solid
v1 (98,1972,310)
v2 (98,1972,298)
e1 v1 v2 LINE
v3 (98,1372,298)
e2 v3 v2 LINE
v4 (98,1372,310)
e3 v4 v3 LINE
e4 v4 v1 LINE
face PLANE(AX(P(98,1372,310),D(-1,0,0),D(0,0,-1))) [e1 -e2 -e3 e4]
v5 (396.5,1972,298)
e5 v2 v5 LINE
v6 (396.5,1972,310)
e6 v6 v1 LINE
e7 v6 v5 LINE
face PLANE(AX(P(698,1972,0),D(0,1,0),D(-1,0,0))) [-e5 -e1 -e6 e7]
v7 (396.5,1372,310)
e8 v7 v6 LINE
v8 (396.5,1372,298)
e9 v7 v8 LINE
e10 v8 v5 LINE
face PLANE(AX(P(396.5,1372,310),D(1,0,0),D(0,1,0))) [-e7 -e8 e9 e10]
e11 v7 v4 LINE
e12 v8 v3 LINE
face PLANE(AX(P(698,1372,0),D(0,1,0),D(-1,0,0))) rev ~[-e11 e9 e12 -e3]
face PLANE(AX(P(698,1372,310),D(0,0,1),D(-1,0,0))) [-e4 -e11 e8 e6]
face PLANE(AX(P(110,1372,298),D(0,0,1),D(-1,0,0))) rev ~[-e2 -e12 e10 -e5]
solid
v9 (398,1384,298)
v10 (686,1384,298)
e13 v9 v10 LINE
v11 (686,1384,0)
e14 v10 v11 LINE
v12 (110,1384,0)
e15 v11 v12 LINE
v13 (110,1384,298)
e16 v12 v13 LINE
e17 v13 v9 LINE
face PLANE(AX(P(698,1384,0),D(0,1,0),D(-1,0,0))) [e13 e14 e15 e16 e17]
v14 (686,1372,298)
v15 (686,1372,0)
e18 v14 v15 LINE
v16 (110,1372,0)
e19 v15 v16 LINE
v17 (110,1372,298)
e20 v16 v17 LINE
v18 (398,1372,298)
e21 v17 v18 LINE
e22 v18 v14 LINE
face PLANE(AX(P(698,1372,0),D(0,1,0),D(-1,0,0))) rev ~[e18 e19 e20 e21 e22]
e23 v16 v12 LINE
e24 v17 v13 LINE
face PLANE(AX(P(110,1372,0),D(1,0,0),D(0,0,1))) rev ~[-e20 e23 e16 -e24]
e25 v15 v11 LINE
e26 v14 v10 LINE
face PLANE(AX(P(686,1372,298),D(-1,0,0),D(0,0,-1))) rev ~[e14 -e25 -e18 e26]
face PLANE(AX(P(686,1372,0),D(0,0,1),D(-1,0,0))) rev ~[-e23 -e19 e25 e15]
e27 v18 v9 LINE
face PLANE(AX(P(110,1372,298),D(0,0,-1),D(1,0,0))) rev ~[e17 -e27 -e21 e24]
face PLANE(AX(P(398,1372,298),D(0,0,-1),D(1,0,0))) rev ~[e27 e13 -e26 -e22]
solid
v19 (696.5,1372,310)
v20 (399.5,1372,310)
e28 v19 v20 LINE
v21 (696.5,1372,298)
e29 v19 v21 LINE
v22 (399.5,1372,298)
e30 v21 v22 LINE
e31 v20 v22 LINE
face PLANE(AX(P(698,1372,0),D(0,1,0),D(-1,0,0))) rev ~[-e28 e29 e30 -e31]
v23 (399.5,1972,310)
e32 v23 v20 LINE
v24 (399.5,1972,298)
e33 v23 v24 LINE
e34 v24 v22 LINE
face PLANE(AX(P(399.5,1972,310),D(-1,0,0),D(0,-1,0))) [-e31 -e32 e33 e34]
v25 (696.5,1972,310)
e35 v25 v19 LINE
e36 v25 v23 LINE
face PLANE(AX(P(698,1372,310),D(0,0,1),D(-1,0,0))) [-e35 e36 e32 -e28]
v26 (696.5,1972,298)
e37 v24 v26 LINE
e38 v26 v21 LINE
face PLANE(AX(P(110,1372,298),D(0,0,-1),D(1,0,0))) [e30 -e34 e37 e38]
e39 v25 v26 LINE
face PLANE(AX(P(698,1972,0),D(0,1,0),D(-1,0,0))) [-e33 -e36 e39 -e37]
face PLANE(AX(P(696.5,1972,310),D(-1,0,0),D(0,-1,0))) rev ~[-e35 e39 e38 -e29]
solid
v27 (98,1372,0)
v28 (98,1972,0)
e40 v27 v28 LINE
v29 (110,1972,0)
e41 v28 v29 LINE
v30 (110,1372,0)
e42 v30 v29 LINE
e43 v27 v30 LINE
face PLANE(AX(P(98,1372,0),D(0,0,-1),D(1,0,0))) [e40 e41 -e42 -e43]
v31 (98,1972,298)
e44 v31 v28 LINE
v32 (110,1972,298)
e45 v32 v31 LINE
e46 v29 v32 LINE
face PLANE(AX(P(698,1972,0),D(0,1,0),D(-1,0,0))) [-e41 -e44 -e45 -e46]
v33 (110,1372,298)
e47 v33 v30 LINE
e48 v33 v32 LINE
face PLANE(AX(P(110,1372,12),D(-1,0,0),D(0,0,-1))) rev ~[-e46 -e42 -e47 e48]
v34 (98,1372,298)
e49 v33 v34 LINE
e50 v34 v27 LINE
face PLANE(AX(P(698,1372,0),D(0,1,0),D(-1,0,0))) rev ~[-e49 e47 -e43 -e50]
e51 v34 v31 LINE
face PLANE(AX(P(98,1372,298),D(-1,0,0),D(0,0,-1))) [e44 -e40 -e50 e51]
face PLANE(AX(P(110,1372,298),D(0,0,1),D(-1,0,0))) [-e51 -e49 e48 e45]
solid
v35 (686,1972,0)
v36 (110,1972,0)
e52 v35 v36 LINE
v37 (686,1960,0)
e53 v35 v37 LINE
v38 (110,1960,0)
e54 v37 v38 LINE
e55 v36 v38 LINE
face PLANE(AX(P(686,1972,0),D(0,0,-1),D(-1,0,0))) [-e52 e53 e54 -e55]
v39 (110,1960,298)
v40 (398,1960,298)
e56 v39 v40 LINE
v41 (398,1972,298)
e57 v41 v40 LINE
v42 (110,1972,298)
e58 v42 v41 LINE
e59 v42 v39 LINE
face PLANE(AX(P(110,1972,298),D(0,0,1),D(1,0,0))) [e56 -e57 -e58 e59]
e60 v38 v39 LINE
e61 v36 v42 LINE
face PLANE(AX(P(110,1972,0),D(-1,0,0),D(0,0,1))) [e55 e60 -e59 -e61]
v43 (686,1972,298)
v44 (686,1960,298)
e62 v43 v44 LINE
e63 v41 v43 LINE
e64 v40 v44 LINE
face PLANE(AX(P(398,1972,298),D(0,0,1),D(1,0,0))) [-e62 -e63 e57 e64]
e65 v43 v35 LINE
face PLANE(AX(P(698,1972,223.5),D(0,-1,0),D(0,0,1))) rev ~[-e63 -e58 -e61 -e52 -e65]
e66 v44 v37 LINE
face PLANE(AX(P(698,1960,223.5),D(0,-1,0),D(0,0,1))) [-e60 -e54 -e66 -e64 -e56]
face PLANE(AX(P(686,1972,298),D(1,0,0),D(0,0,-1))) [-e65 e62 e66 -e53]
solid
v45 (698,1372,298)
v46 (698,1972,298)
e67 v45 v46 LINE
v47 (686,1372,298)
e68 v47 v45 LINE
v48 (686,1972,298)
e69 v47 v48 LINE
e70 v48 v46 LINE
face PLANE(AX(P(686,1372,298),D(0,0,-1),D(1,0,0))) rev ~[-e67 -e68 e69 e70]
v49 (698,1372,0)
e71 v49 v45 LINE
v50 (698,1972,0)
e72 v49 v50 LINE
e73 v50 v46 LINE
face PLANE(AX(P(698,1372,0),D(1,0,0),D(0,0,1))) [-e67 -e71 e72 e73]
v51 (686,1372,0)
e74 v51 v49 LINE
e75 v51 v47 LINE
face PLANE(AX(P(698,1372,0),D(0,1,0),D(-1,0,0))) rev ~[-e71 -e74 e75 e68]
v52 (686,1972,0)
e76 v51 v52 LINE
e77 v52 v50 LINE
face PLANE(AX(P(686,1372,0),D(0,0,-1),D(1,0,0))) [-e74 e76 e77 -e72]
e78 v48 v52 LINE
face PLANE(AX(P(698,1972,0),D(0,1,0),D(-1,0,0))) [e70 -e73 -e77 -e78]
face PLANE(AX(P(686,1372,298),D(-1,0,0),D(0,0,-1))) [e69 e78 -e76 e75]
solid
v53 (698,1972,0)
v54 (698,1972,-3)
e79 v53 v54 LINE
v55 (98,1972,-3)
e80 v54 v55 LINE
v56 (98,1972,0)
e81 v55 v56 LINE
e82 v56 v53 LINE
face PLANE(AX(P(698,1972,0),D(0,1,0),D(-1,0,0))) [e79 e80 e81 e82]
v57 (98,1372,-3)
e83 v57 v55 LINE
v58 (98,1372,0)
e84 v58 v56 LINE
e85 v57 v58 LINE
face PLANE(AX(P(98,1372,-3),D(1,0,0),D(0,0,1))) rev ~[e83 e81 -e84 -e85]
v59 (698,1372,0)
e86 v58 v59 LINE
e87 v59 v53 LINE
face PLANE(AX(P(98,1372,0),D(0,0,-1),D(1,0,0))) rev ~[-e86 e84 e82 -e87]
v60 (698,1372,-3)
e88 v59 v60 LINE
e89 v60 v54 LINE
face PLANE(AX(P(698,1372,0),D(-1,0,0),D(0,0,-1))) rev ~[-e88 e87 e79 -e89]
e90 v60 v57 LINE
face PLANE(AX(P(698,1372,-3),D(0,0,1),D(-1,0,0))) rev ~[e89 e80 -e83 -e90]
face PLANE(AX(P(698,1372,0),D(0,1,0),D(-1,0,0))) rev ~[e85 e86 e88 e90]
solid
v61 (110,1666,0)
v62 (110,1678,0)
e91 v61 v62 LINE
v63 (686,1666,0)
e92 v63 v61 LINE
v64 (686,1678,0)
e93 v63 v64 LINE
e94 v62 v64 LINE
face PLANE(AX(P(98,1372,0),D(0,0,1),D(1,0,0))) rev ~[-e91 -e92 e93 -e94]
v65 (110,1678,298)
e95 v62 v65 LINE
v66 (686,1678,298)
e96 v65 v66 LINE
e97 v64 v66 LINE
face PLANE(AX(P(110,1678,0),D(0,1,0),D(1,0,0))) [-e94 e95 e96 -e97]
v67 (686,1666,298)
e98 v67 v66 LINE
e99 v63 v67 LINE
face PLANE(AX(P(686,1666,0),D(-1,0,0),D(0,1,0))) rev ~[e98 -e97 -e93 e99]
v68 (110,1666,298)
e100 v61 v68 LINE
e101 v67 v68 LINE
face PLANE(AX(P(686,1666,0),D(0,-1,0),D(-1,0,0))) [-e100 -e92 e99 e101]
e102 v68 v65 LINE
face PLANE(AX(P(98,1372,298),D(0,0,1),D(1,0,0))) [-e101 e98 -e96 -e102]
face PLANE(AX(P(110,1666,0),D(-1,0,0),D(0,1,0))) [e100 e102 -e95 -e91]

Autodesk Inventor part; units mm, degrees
ref_plane "YZ Plane" through (0, 0, 0) normal (1, 0, 0) x (0, 1, 0)
sketch "Sketch1" plane through (0, 0, 0) normal (0, 0, 1) x (1, 0, 0)
  line L0 (-1498, 0) -> (1498, 0) construction
  line L1 (-1498, 0) -> (-898, 0)
  line L2 (-898, 0) -> (-898, 2068)
  line L3 (-898, 2068) -> (-1498, 2068)
  line L4 (-1498, 2068) -> (-1498, 0)
  line L5 (-898, 0) -> (-498, 0)
  line L6 (-498, 0) -> (-498, 816)
  line L7 (-498, 816) -> (-898, 816)
  line L8 (-898, 816) -> (-898, 0)
  line L9 (-498, 0) -> (102, 0)
  line L10 (102, 0) -> (102, 816)
  line L11 (102, 816) -> (-498, 816)
  line L12 (-498, 816) -> (-498, 0)
  line L13 (102, 0) -> (698, 0)
  line L14 (698, 0) -> (698, 668)
  line L15 (698, 668) -> (102, 668)
  line L16 (102, 668) -> (102, 0)
  line L17 (698, 0) -> (1498, 0)
  line L18 (1498, 0) -> (1498, 816)
  line L19 (1498, 816) -> (698, 816)
  line L20 (698, 816) -> (698, 0)
  line L21 (-1498, 0) -> (1498, 0)
  line L22 (1498, 0) -> (1498, 96)
  line L23 (1498, 96) -> (-1498, 96)
  line L24 (-1498, 96) -> (-1498, 0)
  line L25 (-898, 816) -> (1498, 816)
  line L26 (1498, 816) -> (1498, 832)
  line L27 (1498, 832) -> (-898, 832)
  line L28 (-898, 832) -> (-898, 816)
  line L29 (-898, 1972) -> (-498, 1972)
  line L30 (-498, 1972) -> (-498, 1372)
  line L31 (-498, 1372) -> (-898, 1372)
  line L32 (-898, 1372) -> (-898, 1972)
  line L33 (698, 1972) -> (1498, 1972)
  line L34 (1498, 1972) -> (1498, 1372)
  line L35 (1498, 1372) -> (698, 1372)
  line L36 (698, 1372) -> (698, 1972)
  line L37 (698, 1372) -> (98, 1372)
  line L38 (98, 1372) -> (98, 1972)
  line L39 (98, 1972) -> (698, 1972)
  line L40 (698, 1972) -> (698, 1372)
  line L41 (-498, 1372) -> (98, 1372)
  line L42 (-498, 1372) -> (-275, 1637.7611)
  line L43 (98, 1372) -> (-125, 1637.7611)
  line L44 (-275, 1637.7611) -> (-125, 1637.7611)
  line L45 (-125, 1637.7611) -> (-125, 2068)
  line L46 (-125, 2068) -> (-275, 2068)
  line L47 (-275, 2068) -> (-275, 1637.7611)
  line L48 (1098, 816) -> (1098, 96)
  line L49 (-198, 816) -> (-198, 96)
  line L50 (-898, 668) -> (-498, 668)
  line L51 (-1498, 520) -> (-898, 520)
  line L52 (-1498, 1579) -> (-898, 1579)
  line L53 (398, 1972) -> (398, 1372)
  line L54 (1098, 1972) -> (1098, 1372)
  line L55 (698, 1876) -> (1498, 1876)
  line L56 (698, 1468) -> (1498, 1468)
  line L57 (-1498, 1049.5) -> (-898, 1049.5)
  point P0 (0, 0)
  point P1 (0, 0)
  point P2 (0, 0)
  point P3 (1098, 816)
  point P4 (-198, 816)
  point P5 (0, 0)
  dimension "d0" = 2996
  dimension "d1" = 600
  dimension "d2" = 2068
  dimension "d3" = 400
  dimension "d4" = 816
  dimension "d5" = 600
  dimension "d6" = 816
  dimension "d7" = 596
  dimension "d8" = 668
  dimension "d9" = 800
  dimension "d10" = 816
  dimension "d11" = 96
  dimension "d12" = 16
  dimension "d13" = 400
  dimension "d14" = 600
  dimension "d15" = 96
  dimension "d16" = 800
  dimension "d17" = 600
  dimension "d18" = 600
  dimension "d19" = 600
  dimension "d20" = 50
  dimension "d21" = 150
  dimension "d22" = 148
  dimension "d23" = 1059
  dimension "d24" = 96
  dimension "d25" = 96
  dimension "d26" = 529.5
ref_plane "Work Plane1" through (698, 1372, 0) normal (0, 1, 0) x (-1, 0, 0)
sketch "Sketch2" plane through (698, 1372, 0) normal (0, 1, 0) x (-1, 0, 0)
  line L0 (600, 0) -> (0, 0)
  line L1 (0, 0) -> (0, 310)
  line L2 (0, 310) -> (600, 310)
  line L3 (600, 310) -> (600, 0)
  line L4 (588, 298) -> (12, 298)
  line L5 (12, 298) -> (12, 12)
  line L6 (12, 12) -> (588, 12)
  line L7 (588, 12) -> (588, 298)
  line L8 (588, 12) -> (588, 0)
  line L9 (12, 12) -> (12, 0)
  line L10 (12, 298) -> (0, 298)
  line L11 (588, 298) -> (600, 298)
  point P0 (698, 0)
  point P1 (600, 0)
  point P2 (0, 0)
  point P3 (0, 0)
  dimension "d28" = 600
  dimension "d29" = 310
  dimension "d30" = 12
extrude "Extrusion1" add sketch "Sketch2" along normal up to surface (600 mm away) contours L0 L8 L7 L11 L3 | L0 L1 L10 L5 L9
extrude "Extrusion2" add sketch "Sketch2" along normal up to surface (600 mm away) separate body contours L11 L4 L10 L1 L2 L3
split body "Split1" sketch "Sketch1" result two bodies bodies 2 curves L53 first body at (498, 1572, 309.5)
sketch "Sketch3" plane through (698, 1372, 0) normal (0, 1, 0) x (-1, 0, 0)
  line L0 (600, 0) -> (600, 298) projected
  line L1 (600, 0) -> (0, 0)
  line L2 (0, 0) -> (0, -3)
  line L3 (0, -3) -> (600, -3)
  line L4 (600, -3) -> (600, 0)
  point P0 (698, 0)
  dimension "d35" = 3
extrude "Extrusion3" add sketch "Sketch3" along normal up to surface (600 mm away) separate body
sketch "Sketch4" plane through (698, 1372, 0) normal (0, 1, 0) x (-1, 0, 0)
  line L0 (0, 0) -> (600, 0) projected
  line L1 (588, 0) -> (588, 298) projected
  line L2 (12, 298) -> (12, 0) projected
  line L3 (300, 298) -> (0, 298) projected
  line L4 (600, 298) -> (300, 298) projected
  point P0 (698, 0)
extrude "Extrusion4" add sketch "Sketch4" along normal blind 12 separate body
ref_plane "Work Plane2" through (698, 1972, 223.5) normal (0, -1, 0) x (0, 0, 1)
sketch "Sketch5" plane through (698, 1972, 223.5) normal (0, -1, 0) x (0, 0, 1)
  line L0 (-223.5, 0) -> (-223.5, 600) projected
  line L1 (-223.5, 588) -> (74.5, 588) projected
  line L2 (74.5, 12) -> (-223.5, 12) projected
  line L3 (74.5, 300) -> (74.5, 0) projected
  line L4 (74.5, 600) -> (74.5, 300) projected
  point P0 (-223.5, 698)
extrude "Extrusion5" add sketch "Sketch5" along normal blind 12 separate body
sketch "Sketch6" plane through (698, 1372, 310) normal (0, 0, 1) x (1, 0, 0)
  line L0 (-600, 600) -> (-300, 600) projected
  line L1 (0, 0) -> (-300, 0) projected
  line L2 (-301.5, 600) -> (-298.5, 600)
  line L3 (-298.5, 600) -> (-298.5, 0)
  line L4 (-298.5, 0) -> (-301.5, 0)
  line L5 (-301.5, 0) -> (-301.5, 600)
  line L6 (-300, 0) -> (-300, 600) projected
  point P0 (-698, -1372)
  dimension "d42" = 1.5
  dimension "d43" = 1.5
extrude "Extrusion6" cut sketch "Sketch6" against normal blind 12 bodies 4 3
sketch "Sketch7" plane through (98, 1372, 0) normal (0, 0, 1) x (1, 0, 0)
  line L0 (12, 0) -> (12, 600) projected
  line L1 (588, 0) -> (588, 600) projected
  line L2 (12, 306) -> (588, 306)
  line L3 (588, 306) -> (588, 294)
  line L4 (588, 294) -> (12, 294)
  line L5 (12, 294) -> (12, 306)
  line L6 (12, 12) -> (588, 12) projected
  point P0 (-98, -1372)
  point P1 (12, 294)
  dimension "d46" = 282
  dimension "d47" = 12
extrude "Extrusion7" add sketch "Sketch7" along normal up to surface (298 mm away) separate body contours L0 L2 L1 L4
sketch "Sketch8" plane through (698, 1372, 310) normal (0, 0, 1) x (1, 0, 0)
  line L0 (0, 600) -> (-298.5, 600) projected
  line L1 (0, 0) -> (-298.5, 0) projected
  line L2 (0, 600) -> (-1.5, 600)
  line L3 (-1.5, 600) -> (-1.5, 0)
  line L4 (-1.5, 0) -> (0, 0)
  line L5 (0, 0) -> (0, 600)
  point P0 (-698, -1372)
  point P1 (-1.5, 600)
  dimension "d50" = 1.5
extrude "Extrusion8" cut sketch "Sketch8" against normal blind 12 bodies 3
properties part number "Wall Cabinet 2"
